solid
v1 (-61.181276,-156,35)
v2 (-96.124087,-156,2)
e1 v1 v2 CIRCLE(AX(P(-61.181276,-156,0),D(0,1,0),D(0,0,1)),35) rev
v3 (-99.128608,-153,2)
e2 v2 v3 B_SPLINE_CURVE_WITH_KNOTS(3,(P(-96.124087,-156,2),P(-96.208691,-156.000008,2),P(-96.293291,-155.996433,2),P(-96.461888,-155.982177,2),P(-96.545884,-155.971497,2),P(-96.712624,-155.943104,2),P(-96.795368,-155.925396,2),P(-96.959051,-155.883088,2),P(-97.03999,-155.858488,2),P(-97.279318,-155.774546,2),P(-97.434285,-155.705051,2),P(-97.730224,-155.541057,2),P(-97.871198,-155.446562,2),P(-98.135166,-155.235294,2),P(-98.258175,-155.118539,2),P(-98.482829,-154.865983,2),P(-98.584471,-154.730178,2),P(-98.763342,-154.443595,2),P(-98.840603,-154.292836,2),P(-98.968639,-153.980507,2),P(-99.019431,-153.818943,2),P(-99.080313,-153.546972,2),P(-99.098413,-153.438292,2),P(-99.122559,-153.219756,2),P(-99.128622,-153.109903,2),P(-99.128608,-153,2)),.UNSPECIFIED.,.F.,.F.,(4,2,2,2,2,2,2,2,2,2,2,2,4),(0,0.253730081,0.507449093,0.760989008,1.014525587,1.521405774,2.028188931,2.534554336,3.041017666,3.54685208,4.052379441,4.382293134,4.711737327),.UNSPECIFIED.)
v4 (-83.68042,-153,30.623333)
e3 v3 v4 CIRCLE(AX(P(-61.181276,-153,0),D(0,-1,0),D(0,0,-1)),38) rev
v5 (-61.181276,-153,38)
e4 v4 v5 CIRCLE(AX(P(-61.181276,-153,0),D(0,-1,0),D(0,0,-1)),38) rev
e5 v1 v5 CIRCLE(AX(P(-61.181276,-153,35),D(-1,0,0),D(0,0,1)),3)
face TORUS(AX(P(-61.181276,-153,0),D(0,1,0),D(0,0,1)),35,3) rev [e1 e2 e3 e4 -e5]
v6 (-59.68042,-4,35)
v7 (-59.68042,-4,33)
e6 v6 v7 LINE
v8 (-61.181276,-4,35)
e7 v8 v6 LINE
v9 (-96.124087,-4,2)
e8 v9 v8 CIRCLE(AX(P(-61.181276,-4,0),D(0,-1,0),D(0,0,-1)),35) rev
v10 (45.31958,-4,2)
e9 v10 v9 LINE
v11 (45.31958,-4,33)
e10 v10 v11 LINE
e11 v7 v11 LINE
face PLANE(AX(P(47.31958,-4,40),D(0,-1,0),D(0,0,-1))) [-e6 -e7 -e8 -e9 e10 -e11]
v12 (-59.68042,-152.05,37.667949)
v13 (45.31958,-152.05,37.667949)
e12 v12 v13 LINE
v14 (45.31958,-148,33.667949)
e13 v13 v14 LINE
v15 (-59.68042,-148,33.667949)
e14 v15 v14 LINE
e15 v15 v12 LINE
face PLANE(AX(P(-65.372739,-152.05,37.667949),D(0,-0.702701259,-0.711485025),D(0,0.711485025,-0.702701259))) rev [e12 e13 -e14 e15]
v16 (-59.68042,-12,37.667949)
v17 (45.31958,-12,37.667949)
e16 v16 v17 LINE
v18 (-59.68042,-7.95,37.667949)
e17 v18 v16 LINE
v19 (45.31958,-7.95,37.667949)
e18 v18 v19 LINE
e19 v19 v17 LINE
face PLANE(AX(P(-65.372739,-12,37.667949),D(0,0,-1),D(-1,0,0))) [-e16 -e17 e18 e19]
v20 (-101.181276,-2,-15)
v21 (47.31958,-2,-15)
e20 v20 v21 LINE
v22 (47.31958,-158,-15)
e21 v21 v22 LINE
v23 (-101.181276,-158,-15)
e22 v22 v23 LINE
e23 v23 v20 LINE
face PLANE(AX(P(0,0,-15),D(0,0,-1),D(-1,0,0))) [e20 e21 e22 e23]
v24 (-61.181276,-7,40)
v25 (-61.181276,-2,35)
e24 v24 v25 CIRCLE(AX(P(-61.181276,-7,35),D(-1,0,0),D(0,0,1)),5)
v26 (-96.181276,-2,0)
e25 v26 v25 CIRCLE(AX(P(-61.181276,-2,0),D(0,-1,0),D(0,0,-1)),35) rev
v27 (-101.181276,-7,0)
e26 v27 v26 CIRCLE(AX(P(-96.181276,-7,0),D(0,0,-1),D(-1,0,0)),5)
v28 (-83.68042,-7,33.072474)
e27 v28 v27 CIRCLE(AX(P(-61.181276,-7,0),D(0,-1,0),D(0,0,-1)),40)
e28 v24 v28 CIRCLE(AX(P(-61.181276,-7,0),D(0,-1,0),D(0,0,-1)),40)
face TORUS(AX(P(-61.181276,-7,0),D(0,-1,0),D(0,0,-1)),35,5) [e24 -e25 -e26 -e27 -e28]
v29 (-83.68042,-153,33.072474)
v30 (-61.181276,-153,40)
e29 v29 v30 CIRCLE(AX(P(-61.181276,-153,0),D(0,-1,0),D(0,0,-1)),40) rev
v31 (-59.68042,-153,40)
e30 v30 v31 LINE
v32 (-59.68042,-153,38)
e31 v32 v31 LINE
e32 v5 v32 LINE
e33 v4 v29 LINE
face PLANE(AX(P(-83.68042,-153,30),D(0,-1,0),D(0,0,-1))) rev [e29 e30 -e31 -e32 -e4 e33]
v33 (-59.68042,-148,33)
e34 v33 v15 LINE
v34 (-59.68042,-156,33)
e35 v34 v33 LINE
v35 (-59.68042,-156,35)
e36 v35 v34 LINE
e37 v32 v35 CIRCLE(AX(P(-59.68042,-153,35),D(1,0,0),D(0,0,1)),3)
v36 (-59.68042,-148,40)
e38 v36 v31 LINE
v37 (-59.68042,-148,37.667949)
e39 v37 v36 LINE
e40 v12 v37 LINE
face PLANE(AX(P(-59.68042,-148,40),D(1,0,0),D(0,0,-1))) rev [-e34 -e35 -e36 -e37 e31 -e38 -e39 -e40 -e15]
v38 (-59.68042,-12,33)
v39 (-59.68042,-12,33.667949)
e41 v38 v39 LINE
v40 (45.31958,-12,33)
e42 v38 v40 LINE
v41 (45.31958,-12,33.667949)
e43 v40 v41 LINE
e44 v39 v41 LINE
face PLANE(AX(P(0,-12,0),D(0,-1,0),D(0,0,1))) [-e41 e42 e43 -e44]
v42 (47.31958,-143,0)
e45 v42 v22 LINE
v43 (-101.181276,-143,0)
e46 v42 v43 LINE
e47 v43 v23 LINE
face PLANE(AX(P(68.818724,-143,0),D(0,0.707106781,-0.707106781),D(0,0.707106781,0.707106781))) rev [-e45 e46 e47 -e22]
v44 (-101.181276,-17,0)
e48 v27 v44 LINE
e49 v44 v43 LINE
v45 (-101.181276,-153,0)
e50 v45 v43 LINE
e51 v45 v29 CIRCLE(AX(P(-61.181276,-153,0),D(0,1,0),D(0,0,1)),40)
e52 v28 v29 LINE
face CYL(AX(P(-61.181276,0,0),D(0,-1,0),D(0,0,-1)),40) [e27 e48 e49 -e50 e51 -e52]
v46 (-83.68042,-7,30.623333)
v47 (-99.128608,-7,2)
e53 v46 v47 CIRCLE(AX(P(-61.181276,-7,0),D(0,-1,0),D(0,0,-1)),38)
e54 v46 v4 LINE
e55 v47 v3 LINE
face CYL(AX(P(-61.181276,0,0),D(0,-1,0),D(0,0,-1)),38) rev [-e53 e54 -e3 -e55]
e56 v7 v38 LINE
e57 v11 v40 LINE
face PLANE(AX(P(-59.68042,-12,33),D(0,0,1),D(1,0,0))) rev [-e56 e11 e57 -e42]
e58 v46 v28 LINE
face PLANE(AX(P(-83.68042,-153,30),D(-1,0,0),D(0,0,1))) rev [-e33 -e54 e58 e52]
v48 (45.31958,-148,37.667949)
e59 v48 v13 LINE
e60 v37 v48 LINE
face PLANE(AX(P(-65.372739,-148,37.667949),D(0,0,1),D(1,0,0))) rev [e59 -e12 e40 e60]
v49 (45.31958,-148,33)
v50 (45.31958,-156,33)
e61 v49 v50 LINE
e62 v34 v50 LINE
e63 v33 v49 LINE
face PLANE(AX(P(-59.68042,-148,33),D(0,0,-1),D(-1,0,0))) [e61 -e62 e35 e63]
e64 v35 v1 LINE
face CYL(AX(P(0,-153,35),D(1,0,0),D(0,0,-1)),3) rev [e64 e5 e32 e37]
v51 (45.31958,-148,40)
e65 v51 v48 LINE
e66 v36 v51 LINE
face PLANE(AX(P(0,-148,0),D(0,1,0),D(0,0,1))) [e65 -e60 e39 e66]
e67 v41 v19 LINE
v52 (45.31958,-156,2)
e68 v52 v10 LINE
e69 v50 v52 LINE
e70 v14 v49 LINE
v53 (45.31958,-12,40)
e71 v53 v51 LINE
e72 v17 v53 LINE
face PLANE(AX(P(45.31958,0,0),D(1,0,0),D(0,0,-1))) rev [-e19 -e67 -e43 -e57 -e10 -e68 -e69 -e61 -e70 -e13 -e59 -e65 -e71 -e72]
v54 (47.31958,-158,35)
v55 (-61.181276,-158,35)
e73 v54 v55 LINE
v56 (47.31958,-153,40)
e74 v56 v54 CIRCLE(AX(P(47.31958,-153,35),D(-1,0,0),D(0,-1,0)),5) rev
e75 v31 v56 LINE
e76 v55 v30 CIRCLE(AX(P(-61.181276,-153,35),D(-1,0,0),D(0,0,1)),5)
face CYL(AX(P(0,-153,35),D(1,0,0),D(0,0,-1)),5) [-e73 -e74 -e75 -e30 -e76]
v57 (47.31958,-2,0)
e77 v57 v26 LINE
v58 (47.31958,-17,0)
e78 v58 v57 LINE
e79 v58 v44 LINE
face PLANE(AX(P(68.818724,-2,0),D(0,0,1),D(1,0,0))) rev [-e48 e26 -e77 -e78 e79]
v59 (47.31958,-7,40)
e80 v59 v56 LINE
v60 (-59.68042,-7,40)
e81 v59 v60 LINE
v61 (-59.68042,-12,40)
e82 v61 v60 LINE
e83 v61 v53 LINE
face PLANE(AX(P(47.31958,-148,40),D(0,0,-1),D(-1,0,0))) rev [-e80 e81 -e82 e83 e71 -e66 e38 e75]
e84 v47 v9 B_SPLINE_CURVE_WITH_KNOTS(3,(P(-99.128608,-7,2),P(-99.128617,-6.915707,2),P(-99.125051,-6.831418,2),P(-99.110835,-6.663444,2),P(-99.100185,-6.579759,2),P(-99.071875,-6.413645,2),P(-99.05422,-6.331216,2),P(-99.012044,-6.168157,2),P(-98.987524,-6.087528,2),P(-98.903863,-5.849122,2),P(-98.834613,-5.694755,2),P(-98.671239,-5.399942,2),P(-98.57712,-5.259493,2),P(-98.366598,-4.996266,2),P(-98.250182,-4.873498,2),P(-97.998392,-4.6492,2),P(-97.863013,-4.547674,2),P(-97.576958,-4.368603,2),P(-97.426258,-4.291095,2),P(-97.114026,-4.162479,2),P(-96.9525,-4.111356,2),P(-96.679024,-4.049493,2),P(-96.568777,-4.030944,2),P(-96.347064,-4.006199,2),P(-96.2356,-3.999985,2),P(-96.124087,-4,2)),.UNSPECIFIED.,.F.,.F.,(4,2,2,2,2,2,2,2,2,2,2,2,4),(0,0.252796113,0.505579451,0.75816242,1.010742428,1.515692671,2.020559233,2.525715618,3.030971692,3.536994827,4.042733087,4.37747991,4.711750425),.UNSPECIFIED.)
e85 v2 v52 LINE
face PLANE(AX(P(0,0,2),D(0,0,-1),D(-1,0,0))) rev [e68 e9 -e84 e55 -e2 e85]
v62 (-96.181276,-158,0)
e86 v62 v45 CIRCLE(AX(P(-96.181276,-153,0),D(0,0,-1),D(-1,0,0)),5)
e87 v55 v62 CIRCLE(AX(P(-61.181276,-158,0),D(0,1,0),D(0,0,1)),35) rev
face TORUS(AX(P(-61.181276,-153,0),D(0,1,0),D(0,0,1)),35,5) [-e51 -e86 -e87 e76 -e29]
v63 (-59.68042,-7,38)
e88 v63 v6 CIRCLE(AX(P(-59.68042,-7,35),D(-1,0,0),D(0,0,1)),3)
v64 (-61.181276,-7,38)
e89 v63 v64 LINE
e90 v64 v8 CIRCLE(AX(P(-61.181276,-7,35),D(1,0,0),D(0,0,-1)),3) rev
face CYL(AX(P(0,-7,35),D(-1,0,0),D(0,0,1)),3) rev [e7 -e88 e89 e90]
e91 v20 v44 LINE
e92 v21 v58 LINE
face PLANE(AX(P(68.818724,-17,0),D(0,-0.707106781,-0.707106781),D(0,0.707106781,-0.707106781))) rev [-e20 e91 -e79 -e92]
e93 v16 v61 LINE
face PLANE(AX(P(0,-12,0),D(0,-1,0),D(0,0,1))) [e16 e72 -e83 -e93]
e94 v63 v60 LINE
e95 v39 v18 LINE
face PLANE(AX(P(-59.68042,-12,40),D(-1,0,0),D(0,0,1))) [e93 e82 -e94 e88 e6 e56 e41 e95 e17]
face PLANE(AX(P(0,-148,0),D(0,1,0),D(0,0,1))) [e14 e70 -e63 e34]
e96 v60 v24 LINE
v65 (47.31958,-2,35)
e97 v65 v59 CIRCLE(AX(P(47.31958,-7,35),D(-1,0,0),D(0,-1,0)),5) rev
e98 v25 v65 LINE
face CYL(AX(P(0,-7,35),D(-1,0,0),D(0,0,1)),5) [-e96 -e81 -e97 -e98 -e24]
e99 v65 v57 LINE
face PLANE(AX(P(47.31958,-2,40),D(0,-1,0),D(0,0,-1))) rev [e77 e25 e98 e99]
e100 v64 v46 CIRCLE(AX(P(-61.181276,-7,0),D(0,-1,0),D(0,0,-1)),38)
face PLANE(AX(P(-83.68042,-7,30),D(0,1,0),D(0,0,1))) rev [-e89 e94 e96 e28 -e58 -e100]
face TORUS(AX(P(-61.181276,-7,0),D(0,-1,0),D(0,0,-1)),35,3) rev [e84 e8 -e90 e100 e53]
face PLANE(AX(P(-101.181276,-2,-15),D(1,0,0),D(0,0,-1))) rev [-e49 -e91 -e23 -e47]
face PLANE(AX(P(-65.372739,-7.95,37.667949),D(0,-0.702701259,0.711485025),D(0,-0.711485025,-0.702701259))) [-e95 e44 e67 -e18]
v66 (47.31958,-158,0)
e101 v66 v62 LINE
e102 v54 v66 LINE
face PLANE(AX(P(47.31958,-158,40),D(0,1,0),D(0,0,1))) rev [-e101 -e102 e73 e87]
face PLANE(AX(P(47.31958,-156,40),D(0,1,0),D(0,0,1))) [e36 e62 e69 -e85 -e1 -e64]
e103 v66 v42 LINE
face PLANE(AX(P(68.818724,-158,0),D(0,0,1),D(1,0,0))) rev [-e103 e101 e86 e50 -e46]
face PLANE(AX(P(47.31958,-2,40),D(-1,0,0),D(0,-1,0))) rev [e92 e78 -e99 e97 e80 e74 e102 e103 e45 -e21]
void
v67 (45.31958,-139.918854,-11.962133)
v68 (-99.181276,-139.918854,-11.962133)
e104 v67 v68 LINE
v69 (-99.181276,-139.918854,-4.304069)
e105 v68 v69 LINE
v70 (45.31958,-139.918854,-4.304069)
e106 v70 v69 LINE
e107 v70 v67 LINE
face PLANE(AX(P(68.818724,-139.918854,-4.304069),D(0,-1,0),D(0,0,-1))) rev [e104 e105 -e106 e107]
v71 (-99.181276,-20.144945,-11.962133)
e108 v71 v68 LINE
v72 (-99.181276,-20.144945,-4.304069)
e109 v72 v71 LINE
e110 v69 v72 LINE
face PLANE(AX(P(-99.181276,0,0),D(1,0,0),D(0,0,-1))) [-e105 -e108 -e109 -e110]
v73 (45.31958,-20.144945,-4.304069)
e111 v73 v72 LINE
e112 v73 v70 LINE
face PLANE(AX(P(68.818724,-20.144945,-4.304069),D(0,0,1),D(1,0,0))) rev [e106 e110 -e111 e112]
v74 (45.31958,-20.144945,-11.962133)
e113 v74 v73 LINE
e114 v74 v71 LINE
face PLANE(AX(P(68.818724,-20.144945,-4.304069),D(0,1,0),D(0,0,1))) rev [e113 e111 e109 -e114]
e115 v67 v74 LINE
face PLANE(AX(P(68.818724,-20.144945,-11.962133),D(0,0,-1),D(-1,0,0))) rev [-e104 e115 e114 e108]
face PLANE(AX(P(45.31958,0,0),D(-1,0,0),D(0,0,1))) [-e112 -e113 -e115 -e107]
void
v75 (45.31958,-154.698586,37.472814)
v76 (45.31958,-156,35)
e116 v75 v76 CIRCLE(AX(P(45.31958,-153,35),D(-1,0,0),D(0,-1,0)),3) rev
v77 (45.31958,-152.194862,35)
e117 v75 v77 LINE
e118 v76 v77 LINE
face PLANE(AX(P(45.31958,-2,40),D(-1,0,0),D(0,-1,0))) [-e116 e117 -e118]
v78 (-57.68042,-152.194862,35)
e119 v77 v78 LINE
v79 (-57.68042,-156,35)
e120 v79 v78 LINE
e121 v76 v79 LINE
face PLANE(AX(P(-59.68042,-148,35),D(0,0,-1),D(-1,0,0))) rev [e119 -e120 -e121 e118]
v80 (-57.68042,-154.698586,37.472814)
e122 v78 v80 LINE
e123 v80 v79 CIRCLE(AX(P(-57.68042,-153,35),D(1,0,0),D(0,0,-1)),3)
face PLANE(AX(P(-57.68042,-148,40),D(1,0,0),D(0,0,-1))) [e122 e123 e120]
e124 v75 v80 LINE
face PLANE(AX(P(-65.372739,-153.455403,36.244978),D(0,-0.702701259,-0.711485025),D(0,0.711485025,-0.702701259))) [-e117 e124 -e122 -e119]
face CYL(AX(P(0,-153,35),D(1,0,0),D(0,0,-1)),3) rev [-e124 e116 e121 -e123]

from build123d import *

# Parameters (mm, degrees)
SKETCH1_W            = 148.500856602
SKETCH1_H            = 156
BOSS_EXTRUDE1_DEPTH  = 40
FILLET3_R            = 40
FILLET4_R            = 5
SHELL4_T             = -2
SKETCH19_W           = 131
SKETCH19_H           = 146
CUT_EXTRUDE8_DEPTH   = 10
SKETCH21_W           = 107
SKETCH21_H           = 2
BOSS_EXTRUDE7_DEPTH  = 5
BOSS_EXTRUDE8_START  = -107
BOSS_EXTRUDE8_DEPTH  = 107
CUT_EXTRUDE9_DEPTH   = 107
BOSS_EXTRUDE9_DEPTH  = 2
BOSS_EXTRUDE10_DEPTH = 15
CUT_EXTRUDE10_DEPTH  = 170
SHELL5_START         = -57.680419874
SHELL5_DEPTH         = 103
SKETCH29_W           = 7.658063704
SKETCH29_H           = 119.773909492
CUT_EXTRUDE11_DEPTH  = 170
SKETCH31_W           = 7.658063704
SKETCH31_H           = 119.773909492
BOSS_EXTRUDE12_DEPTH = 2
SKETCH32_W           = 7.658063704
SKETCH32_H           = 119.773909492
BOSS_EXTRUDE13_DEPTH = 2


# Read off the part's stored shape, not the designer's step: Shell5
# Some blends are built 0.0001 mm under size
with BuildPart() as part:
    # Sketch1 → Boss-Extrude1 (new body)
    with BuildSketch(Plane.XY):
        with Locations((-26.930848175, -80)):
            Rectangle(SKETCH1_W, SKETCH1_H)
    extrude(amount=BOSS_EXTRUDE1_DEPTH)

    # Fillet3
    fillet3_edges = [part.edges().sort_by_distance(p)[0] for p in [
        (-101.181276476, -80, 40),
    ]]
    fillet(fillet3_edges, radius=FILLET3_R - 0.0001)  # a hair under: the kernel refuses the full size

    # Fillet4
    # the kernel refuses this fillet: 5 mm, written as the material it takes off along each edge
    with BuildSketch(Plane(origin=(-61.181376476, -158, 40), x_dir=(0, 1, 0), z_dir=(1, 0, 0))) as fillet4_piece_1:
        with BuildLine():
            CenterArc((FILLET4_R, -FILLET4_R), FILLET4_R, 90, 90)
            Line((0, -FILLET4_R), (0, 0))
            Line((0, 0), (FILLET4_R, 0))
        make_face()
    extrude(amount=121.000956602, mode=Mode.SUBTRACT)
    with BuildSketch(Plane(origin=(-61.181376476, -158, 0.0001), x_dir=(-1, 0, 0), z_dir=(0, 0, -1))) as fillet4_piece_2:
        with BuildLine():
            CenterArc((39.9999 - FILLET4_R, FILLET4_R), FILLET4_R, 270, 90)
            Line((39.9999 - FILLET4_R, 0), (39.9999, 0))
            Line((39.9999, 0), (39.9999, FILLET4_R))
        make_face()
    revolve(axis=Axis((-61.181376476, -158, 0.0001), (0, 1, 0)), revolution_arc=90, mode=Mode.SUBTRACT)
    with BuildSketch(Plane(origin=(-61.181376476, -2, 0.0001), x_dir=(-1, 0, 0), z_dir=(0, 0, -1))) as fillet4_piece_3:
        with BuildLine():
            CenterArc((39.9999 - FILLET4_R, -FILLET4_R), FILLET4_R, 0, 90)
            Line((39.9999, -FILLET4_R), (39.9999, 0))
            Line((39.9999, 0), (39.9999 - FILLET4_R, 0))
        make_face()
    revolve(axis=Axis((-61.181376476, -2, 0.0001), (0, 1, 0)), revolution_arc=90, mode=Mode.SUBTRACT)
    with BuildSketch(Plane(origin=(59.819580126, -2, 40), x_dir=(0, 0, -1), z_dir=(-1, 0, 0))) as fillet4_piece_4:
        with BuildLine():
            CenterArc((FILLET4_R, FILLET4_R), FILLET4_R, 180, 90)
            Line((0, FILLET4_R), (0, 0))
            Line((0, 0), (FILLET4_R, 0))
        make_face()
    extrude(amount=121.000956602, mode=Mode.SUBTRACT)
    with BuildSketch(Plane(origin=(-101.181276476, -2, -12.5), x_dir=(1, 0, 0), z_dir=(0, 0, 1)), Plane(origin=(-101.181276476, -158, -12.5), x_dir=(0, 1, 0), z_dir=(0, 0, 1))) as fillet4_piece_5:
        with BuildLine():
            CenterArc((FILLET4_R, -FILLET4_R), FILLET4_R, 90, 90)
            Line((0, -FILLET4_R), (0, 0))
            Line((0, 0), (FILLET4_R, 0))
        make_face()
    extrude(amount=12.5001, mode=Mode.SUBTRACT)

    # Shell4
    shell4_openings = [part.faces().sort_by_distance(p)[0] for p in [
        (47.319580126, -80, 19.967473228),
    ]]
    offset(amount=SHELL4_T, openings=shell4_openings)

    # Sketch19 → Cut-Extrude8 (cut)
    with BuildSketch(Plane.XY.offset(40)):
        with Locations((-18.180419874, -80)):
            Rectangle(SKETCH19_W, SKETCH19_H)
    extrude(amount=-CUT_EXTRUDE8_DEPTH, mode=Mode.SUBTRACT)

    # Sketch21 → Boss-Extrude7 (add)
    with BuildSketch(Plane(origin=(0, -153, 0), x_dir=(1, 0, 0), z_dir=(0, 1, 0))):
        with Locations((-6.180419874, -39)):
            Rectangle(SKETCH21_W, SKETCH21_H)
    boss_extrude7 = extrude(amount=BOSS_EXTRUDE7_DEPTH)

    # Sketch22 → Boss-Extrude8 (add)
    with BuildSketch(Plane(origin=(47.319580126, 0, 0), x_dir=(0, 0, -1), z_dir=(1, 0, 0)).offset(BOSS_EXTRUDE8_START)):
        with BuildLine():
            Line((-38, -148), (-33, -148))
            Line((-33, -148), (-33, -156))
            Line((-33, -156), (-35, -156))
            ThreePointArc((-35, -156), (-37.121320344, -155.121320344), (-38, -153))
            Line((-38, -153), (-38, -148))
        make_face()
    boss_extrude8 = extrude(amount=BOSS_EXTRUDE8_DEPTH)

    # Sketch23 → Cut-Extrude9 (cut)
    with BuildSketch(Plane(origin=(47.319580126, 0, 0), x_dir=(0, 0, -1), z_dir=(1, 0, 0))):
        Polygon((-37.667948512, -148), (-37.667948512, -152.05), (-33.667948512, -148), align=None)
    cut_extrude9 = extrude(amount=-CUT_EXTRUDE9_DEPTH, mode=Mode.SUBTRACT)

    # Mirror1: Boss-Extrude7, Boss-Extrude8, Cut-Extrude9 across plane
    add(boss_extrude7.mirror(Plane.ZX.offset(-80)))
    add(boss_extrude8.mirror(Plane.ZX.offset(-80)))
    add(cut_extrude9.mirror(Plane.ZX.offset(-80)), mode=Mode.SUBTRACT)

    # Sketch25 → Boss-Extrude9 (add)
    with BuildSketch(Plane(origin=(47.319580126, 0, 0), x_dir=(0, 0, -1), z_dir=(1, 0, 0))):
        Polygon((-40, -148), (-37.667948512, -148), (-37.667948512, -152.05), (-33.667948512, -148), (-33, -148), (-33, -156), (-2, -156), (-2, -4), (-33, -4), (-33, -12), (-33.667948512, -12), (-37.667948512, -7.95), (-37.667948512, -12), (-40, -12), align=None)
    extrude(amount=-BOSS_EXTRUDE9_DEPTH)

    # Sketch26 → Boss-Extrude10 (add)
    with BuildSketch(Plane(origin=(0, 0, 0), x_dir=(-1, 0, 0), z_dir=(0, 0, -1))):
        Polygon((101.181276476, -7), (101.181276476, -153), (101.181276476, -158), (96.181276476, -158), (-47.319580126, -158), (-47.319580126, -2), (96.181276476, -2), (101.181276476, -2), align=None)
    extrude(amount=BOSS_EXTRUDE10_DEPTH)

    # Sketch27 → Cut-Extrude10 (cut)
    with BuildSketch(Plane.ZY.offset(101.181276476)):
        Polygon((0, -2), (0, -17), (-15, -2), align=None)
        Polygon((0, -158), (0, -143), (-15, -158), align=None)
    extrude(amount=-CUT_EXTRUDE10_DEPTH, mode=Mode.SUBTRACT)

    # Shell5 outline → Shell5 (cut)
    with BuildSketch(Plane.YZ.offset(SHELL5_START)):
        with BuildLine():
            Line((-152.194861825, 35), (-154.69858558, 37.472813585))
            ThreePointArc((-154.69858558, 37.472813585), (-155.654784053, 36.397183463), (-156, 35))
            Line((-156, 35), (-152.194861825, 35))
        make_face()
    extrude(amount=SHELL5_DEPTH, mode=Mode.SUBTRACT)

    # Sketch29 → Cut-Extrude11 (cut)
    with BuildSketch(Plane.ZY.offset(101.181276476)):
        with Locations((-8.13310084, -80.031899357)):
            Rectangle(SKETCH29_W, SKETCH29_H)
    extrude(amount=-CUT_EXTRUDE11_DEPTH, mode=Mode.SUBTRACT)

    # Sketch31 → Boss-Extrude12 (add)
    with BuildSketch(Plane(origin=(47.319580126, 0, 0), x_dir=(0, 0, -1), z_dir=(1, 0, 0))):
        with Locations((8.13310084, -80.031899357)):
            Rectangle(SKETCH31_W, SKETCH31_H)
    extrude(amount=-BOSS_EXTRUDE12_DEPTH)

    # Sketch32 → Boss-Extrude13 (add)
    with BuildSketch(Plane.ZY.offset(101.181276476)):
        with Locations((-8.13310084, -80.031899357)):
            Rectangle(SKETCH32_W, SKETCH32_H)
    extrude(amount=-BOSS_EXTRUDE13_DEPTH)


solid = part.part
